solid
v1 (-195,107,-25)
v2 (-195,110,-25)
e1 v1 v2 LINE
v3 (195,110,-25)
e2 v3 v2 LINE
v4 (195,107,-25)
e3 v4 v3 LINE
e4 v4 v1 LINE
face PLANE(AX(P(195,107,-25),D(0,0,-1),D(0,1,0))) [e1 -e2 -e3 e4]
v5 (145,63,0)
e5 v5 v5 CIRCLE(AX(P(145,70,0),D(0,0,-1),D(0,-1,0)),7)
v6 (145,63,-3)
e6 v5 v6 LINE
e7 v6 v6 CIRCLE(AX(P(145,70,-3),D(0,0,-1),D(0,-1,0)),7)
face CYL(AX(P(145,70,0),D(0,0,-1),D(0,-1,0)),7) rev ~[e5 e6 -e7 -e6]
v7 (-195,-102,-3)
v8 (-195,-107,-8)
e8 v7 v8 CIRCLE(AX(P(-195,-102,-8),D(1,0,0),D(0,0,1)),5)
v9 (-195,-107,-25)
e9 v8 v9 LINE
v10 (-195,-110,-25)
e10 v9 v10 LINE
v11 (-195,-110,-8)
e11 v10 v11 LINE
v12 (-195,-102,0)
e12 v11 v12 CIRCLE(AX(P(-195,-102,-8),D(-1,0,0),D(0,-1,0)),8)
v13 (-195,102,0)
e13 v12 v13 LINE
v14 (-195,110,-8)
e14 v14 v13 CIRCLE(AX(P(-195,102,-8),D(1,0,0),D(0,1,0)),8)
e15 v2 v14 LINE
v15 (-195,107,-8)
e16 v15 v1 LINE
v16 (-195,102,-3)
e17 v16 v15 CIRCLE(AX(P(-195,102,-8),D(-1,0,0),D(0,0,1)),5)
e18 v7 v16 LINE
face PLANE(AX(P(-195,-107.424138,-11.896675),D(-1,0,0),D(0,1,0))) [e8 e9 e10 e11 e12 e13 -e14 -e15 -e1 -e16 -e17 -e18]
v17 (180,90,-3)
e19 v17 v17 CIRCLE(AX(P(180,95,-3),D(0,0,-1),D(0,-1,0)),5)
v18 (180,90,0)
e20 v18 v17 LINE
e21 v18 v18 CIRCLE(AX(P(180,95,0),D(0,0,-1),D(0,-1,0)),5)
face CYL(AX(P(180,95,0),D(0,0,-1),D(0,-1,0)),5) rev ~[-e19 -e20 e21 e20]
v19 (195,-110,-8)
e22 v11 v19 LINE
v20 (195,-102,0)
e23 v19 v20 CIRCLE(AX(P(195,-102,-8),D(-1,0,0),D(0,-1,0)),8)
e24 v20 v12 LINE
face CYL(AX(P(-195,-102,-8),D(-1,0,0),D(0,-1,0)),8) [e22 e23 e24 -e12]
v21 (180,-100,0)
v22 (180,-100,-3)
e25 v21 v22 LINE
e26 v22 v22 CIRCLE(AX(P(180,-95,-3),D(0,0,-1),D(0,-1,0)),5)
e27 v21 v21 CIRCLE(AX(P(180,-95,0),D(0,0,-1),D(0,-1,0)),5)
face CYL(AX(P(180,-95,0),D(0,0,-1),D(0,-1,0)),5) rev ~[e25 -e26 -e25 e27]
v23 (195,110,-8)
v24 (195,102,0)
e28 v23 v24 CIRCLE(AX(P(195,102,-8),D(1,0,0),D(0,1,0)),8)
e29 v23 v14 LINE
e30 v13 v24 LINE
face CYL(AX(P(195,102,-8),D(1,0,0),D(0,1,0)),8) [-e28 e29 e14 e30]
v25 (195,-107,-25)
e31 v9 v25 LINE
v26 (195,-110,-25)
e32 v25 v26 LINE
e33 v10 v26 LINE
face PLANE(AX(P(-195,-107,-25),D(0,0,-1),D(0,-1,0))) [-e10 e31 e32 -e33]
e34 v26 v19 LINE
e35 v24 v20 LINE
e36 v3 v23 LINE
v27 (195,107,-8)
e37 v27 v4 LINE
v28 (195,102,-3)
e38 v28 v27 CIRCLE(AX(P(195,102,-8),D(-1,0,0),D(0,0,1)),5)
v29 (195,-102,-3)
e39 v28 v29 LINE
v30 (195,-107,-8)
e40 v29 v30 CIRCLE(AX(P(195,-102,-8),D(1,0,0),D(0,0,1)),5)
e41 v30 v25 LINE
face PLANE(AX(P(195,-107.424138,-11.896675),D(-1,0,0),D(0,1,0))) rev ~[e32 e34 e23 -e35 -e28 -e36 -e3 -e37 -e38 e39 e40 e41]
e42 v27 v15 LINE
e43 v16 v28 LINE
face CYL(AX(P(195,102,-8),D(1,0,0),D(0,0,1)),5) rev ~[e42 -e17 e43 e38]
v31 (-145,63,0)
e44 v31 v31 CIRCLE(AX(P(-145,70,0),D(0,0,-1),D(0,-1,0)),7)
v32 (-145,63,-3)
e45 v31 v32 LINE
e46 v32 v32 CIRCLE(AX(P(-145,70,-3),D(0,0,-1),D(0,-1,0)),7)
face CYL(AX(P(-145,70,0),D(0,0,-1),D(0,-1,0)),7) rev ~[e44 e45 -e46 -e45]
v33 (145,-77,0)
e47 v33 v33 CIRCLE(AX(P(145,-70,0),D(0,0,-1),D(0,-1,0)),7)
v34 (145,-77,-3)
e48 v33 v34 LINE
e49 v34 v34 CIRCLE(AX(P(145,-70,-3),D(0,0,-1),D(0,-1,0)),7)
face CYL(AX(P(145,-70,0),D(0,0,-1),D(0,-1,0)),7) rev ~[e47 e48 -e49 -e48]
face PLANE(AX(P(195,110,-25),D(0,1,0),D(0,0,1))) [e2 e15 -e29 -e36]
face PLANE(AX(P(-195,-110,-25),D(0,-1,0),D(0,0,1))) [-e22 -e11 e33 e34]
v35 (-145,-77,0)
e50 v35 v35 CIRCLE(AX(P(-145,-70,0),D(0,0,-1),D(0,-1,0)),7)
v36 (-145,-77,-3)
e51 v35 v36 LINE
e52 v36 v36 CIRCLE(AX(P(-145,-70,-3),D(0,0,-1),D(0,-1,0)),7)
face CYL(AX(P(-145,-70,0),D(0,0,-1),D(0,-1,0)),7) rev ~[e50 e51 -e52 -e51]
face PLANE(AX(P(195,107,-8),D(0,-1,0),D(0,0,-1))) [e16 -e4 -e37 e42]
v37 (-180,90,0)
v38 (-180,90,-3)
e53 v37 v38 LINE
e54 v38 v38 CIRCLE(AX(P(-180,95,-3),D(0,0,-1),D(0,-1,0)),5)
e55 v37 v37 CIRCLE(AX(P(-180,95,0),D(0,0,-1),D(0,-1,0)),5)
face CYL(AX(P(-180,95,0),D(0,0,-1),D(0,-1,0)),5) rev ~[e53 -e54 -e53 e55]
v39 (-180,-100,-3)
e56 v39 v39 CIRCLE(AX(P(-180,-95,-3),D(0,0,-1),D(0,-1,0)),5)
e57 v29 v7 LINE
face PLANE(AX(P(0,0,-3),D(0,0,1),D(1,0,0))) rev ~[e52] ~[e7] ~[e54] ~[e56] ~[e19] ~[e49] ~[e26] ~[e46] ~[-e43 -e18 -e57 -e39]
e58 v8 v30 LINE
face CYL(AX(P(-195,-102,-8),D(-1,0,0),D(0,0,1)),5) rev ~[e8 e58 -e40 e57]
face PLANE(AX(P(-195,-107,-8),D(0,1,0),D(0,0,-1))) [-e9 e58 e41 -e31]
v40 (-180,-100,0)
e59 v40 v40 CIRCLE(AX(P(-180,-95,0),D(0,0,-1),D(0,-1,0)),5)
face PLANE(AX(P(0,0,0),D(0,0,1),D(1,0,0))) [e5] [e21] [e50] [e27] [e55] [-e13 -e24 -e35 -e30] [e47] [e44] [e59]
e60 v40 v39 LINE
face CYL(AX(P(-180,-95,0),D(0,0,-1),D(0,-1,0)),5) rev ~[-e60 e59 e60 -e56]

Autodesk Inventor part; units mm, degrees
ref_plane "YZ Plane" through (0, 0, 0) normal (1, 0, 0) x (0, 1, 0)
ref_plane "XZ Plane" through (0, 0, 0) normal (0, 1, 0) x (-1, 0, 0)
ref_plane "XY Plane" through (0, 0, 0) normal (0, 0, 1) x (1, 0, 0)
sketch "Sketch1" plane through (0, 0, 0) normal (0, 0, 1) x (1, 0, 0)
  line L0 (-195, 110) -> (195, 110)
  line L1 (195, 110) -> (195, -110)
  line L2 (195, -110) -> (-195, -110)
  line L3 (-195, -110) -> (-195, 110)
  line L4 (-195, 110) -> (195, -110) construction
  point P0 (0, 0)
  point P1 (0, 0)
  dimension "d0" = 390
  dimension "d1" = 220
extrude "Plate1" add sketch "Sketch1" against normal blind 3
sketch "Sketch2" plane through (0, 0, 0) normal (0, 0, 1) x (1, 0, 0)
  line L0 (-145, 70) -> (145, 70) construction
  line L1 (145, 70) -> (145, -70) construction
  line L2 (145, -70) -> (-145, -70) construction
  line L3 (-145, -70) -> (-145, 70) construction
  line L4 (195, -110) -> (195, 110) projected
  point P0 (0, 0)
  point P1 (-145, 0)
  point P2 (0, 70)
  dimension "d3" = 290
  dimension "d4" = 140
hole "Hole1" at (-145, 70, 0) at (145, 70, 0) at (-145, -70, 0) at (145, -70, 0) direction (0, 0, -1) diameter 14 end through all
sketch "Sketch3" plane through (0, 0, 0) normal (0, 0, 1) x (1, 0, 0)
  line L0 (-180, 95) -> (180, 95) construction
  line L1 (180, 95) -> (180, -95) construction
  line L2 (180, -95) -> (-180, -95) construction
  line L3 (-180, -95) -> (-180, 95) construction
  line L4 (-180, 95) -> (180, -95) construction
  point P0 (0, 0)
  point P1 (0, 0)
  dimension "d14" = 190
  dimension "d15" = 360
hole "Hole2" at (-180, 95, 0) at (180, 95, 0) at (180, -95, 0) at (-180, -95, 0) direction (0, 0, -1) diameter 10 end through all
sketch "Sketch4" plane through (-195, -107, 0) normal (0, -1, 0) x (1, 0, 0)
  line L0 (390, 0) -> (0, 0)
  line L1 (0, 0) -> (0, -25)
  line L2 (0, -25) -> (390, -25)
  line L3 (390, -25) -> (390, 0)
edge flange "Flange1" height 25 angle 90 thickness 3 bend radius 5 thickness toward (0, -1, 0) relief round relief width 3 relief depth 1.5 corner gap 5 corner form 0 edges at (0, -110, -3) (0, 110, -3) wall of the first edge with corners at (195, -107, 0) (-195, -107, 0) (-195, -107, -25) (195, -107, -25)
bend "Bend1"
corner "Corner1"
equation "\"d11\" = Thickness"
equation "\"d2\" = Thickness"
equation "\"d23\" = BendReliefWidth"
equation "\"d24\" = BendReliefDepth"
equation "\"d25\" = MinimumRemnant"
equation "\"d26\" = TransitionRadius"
equation "\"d29\" = BendRadius"
equation "\"d30\" = CornerReliefSize"
equation "\"d31\" = GapSize"
equation "\"d32\" = JacobiRadiusSize"
equation "\"BendReliefWidth\" = Thickness"
equation "\"BendReliefDepth\" = 0.5 * Thickness"
equation "\"CornerReliefSize\" = 4 * Thickness"
equation "\"MinimumRemnant\" = 2 * Thickness"
equation "\"TransitionRadius\" = BendRadius"
equation "\"JacobiRadiusSize\" = BendRadius"
equation "\"GapSize\" = Thickness"
equation "\"Thickness\" = 3"
equation "\"BendRadius\" = 5"
properties part number "AIRPUMP plate" material "Stainless Steel"
